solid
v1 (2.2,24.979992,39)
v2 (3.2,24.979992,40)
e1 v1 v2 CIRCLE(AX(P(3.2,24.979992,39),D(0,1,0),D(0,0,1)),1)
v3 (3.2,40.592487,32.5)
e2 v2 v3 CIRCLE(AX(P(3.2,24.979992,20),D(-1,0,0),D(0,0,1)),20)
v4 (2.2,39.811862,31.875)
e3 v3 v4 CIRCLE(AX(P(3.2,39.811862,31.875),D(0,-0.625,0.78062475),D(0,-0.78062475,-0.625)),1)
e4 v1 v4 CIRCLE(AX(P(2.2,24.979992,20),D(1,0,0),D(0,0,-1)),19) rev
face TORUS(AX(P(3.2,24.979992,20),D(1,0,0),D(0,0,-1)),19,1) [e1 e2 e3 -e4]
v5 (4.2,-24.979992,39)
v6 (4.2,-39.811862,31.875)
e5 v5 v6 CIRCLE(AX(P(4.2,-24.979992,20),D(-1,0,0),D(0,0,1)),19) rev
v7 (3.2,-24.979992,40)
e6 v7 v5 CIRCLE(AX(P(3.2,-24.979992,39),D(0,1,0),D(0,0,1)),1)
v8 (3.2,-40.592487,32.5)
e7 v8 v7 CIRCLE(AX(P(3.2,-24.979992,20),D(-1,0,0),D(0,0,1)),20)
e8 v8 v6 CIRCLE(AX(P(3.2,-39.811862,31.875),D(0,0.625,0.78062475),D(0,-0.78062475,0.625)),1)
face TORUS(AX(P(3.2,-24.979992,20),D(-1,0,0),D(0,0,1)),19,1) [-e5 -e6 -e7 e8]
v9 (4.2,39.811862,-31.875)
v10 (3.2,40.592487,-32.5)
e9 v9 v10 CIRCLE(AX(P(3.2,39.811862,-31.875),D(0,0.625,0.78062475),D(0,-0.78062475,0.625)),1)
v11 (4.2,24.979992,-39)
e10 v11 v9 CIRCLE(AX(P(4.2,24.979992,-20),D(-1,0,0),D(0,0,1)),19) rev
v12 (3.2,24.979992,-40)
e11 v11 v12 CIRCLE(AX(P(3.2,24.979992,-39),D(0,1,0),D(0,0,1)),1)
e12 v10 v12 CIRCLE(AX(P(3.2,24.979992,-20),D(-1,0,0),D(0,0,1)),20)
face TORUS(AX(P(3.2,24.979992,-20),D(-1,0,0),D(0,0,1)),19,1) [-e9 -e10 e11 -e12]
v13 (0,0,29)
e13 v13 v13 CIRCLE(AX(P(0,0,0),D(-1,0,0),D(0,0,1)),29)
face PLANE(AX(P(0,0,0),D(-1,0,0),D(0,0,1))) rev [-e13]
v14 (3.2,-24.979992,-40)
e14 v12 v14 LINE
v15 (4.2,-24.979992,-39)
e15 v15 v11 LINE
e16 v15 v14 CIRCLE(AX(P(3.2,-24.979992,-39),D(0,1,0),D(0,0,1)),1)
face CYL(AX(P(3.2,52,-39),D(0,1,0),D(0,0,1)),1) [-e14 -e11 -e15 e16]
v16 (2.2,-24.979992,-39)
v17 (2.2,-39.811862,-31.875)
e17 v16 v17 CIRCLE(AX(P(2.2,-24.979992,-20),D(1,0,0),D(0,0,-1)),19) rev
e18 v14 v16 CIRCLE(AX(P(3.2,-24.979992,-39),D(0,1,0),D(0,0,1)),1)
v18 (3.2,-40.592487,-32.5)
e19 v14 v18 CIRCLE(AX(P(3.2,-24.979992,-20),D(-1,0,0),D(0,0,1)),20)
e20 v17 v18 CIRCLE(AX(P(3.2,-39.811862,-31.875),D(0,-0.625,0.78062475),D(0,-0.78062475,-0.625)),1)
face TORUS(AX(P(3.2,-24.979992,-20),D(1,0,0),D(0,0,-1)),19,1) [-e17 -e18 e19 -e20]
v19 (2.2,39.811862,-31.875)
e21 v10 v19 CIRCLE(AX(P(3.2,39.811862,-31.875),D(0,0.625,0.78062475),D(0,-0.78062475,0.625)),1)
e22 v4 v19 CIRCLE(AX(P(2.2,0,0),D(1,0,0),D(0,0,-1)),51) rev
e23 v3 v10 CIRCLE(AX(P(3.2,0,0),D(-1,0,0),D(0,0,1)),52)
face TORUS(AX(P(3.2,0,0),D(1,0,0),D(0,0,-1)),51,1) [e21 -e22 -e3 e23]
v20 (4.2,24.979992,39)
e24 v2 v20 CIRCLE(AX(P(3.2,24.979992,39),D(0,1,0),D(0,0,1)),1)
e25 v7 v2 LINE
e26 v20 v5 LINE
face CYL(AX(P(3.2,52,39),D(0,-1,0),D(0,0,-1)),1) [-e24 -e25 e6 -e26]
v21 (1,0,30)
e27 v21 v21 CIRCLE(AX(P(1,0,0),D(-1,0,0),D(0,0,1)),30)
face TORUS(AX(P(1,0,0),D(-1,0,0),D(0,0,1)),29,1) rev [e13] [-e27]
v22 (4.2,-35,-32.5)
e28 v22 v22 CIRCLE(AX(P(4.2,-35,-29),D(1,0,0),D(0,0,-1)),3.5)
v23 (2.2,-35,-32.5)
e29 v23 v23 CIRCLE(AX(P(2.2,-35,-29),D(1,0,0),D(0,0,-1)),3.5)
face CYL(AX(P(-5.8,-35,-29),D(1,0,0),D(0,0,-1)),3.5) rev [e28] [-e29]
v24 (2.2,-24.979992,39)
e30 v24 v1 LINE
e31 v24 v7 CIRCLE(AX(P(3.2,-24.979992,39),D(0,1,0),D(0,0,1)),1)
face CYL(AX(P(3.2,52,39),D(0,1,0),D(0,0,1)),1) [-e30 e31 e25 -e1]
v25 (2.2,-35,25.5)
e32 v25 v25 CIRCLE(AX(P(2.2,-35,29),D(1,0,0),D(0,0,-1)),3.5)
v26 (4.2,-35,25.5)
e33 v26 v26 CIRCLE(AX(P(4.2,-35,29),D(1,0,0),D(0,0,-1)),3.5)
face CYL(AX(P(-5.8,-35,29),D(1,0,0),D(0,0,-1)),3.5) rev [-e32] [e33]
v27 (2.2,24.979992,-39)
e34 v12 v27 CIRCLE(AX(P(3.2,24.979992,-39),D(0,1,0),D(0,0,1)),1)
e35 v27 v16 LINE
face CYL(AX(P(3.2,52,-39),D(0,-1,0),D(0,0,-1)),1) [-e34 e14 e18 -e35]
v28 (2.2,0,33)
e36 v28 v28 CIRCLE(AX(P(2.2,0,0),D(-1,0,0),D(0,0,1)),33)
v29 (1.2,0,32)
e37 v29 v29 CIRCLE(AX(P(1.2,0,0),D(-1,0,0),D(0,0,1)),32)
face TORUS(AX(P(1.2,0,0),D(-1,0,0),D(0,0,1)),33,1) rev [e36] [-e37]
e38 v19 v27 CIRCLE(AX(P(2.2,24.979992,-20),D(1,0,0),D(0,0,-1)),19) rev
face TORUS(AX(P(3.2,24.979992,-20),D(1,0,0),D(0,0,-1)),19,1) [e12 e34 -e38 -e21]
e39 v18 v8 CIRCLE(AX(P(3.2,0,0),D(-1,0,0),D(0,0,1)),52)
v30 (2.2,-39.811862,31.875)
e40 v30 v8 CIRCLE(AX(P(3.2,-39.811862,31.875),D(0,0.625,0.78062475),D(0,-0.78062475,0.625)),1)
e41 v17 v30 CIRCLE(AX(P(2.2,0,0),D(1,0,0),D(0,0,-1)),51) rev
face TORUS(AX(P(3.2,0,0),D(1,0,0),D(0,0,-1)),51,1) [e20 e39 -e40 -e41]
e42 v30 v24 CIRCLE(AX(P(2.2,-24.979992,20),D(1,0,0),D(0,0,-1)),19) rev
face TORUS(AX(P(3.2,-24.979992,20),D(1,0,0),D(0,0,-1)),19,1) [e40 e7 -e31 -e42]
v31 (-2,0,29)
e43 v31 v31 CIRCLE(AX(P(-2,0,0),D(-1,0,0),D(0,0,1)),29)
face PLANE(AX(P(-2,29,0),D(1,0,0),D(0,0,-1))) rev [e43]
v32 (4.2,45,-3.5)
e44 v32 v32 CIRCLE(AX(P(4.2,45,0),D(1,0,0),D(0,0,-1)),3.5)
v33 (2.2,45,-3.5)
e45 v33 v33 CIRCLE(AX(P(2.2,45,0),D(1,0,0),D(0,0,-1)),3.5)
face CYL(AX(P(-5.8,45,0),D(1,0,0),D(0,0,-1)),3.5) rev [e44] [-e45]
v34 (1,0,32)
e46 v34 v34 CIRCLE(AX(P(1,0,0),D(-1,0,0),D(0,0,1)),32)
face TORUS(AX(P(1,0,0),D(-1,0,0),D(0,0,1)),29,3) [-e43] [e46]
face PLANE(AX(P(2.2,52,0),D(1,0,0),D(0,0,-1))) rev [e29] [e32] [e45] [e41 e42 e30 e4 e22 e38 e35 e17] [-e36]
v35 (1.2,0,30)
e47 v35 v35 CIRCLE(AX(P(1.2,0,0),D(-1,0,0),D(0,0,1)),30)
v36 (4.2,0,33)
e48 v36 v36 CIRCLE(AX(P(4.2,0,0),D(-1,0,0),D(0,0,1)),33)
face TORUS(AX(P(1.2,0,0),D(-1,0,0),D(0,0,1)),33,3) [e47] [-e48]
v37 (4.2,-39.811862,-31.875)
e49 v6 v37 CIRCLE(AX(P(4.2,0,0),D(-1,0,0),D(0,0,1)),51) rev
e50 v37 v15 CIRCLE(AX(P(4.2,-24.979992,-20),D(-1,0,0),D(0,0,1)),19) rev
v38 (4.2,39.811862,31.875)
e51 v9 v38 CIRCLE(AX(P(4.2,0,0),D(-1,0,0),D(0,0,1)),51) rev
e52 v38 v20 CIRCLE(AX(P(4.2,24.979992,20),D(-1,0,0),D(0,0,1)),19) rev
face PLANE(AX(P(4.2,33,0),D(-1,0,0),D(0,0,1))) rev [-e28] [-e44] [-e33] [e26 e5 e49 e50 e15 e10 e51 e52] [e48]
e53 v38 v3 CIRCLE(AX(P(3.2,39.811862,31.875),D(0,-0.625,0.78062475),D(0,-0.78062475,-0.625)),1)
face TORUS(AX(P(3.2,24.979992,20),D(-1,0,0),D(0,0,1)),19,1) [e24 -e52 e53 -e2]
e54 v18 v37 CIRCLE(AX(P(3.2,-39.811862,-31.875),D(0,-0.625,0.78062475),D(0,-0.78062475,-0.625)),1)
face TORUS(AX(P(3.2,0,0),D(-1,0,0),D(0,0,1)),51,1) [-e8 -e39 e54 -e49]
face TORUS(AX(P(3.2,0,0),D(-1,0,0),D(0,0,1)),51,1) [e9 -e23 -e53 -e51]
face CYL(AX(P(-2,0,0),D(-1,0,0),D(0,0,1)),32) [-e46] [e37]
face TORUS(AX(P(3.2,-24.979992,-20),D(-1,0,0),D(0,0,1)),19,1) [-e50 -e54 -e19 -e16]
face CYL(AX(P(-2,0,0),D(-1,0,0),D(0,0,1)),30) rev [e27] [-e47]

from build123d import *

# Parameters (mm, degrees)
SKETCH2_OUTSIDE_W   = 135.442
SKETCH2_OUTSIDE_H   = 135.442
SKETCH2_OUTSIDE_W_2 = 80
SKETCH2_OUTSIDE_H_2 = 104
CUT_EXTRUDE1_DEPTH  = 74.8
SKETCH3_R           = 3.5
CUT_EXTRUDE2_DEPTH  = 10
FILLET1_R           = 20
FILLET2_R           = 1


with BuildPart() as part:
    # Sketch1 → Revolve1 (revolve)
    with BuildSketch(Plane.XY, mode=Mode.PRIVATE) as revolve1_sk:
        with BuildLine():
            Line((0, 0), (0, 29))
            ThreePointArc((0, 29), (0.292893219, 29.707106781), (1, 30))
            Line((1, 30), (1.2, 30))
            ThreePointArc((1.2, 30), (3.321320344, 30.878679656), (4.2, 33))
            Line((4.2, 33), (4.2, 52))
            Line((4.2, 52), (2.2, 52))
            Line((2.2, 52), (2.2, 33))
            ThreePointArc((2.2, 33), (1.907106781, 32.292893219), (1.2, 32))
            Line((1.2, 32), (1, 32))
            ThreePointArc((1, 32), (-1.121320344, 31.121320344), (-2, 29))
            Line((-2, 29), (-2, 0))
            Line((-2, 0), (0, 0))
        make_face()
    revolve(revolve1_sk.sketch.rotate(Axis((-2, 0, 0), (1, 0, 0)), 90), axis=Axis((-2, 0, 0), (1, 0, 0)))

    # Sketch2 outside → Cut-Extrude1 (cut, through all)
    with BuildSketch(Plane(origin=(4.2, 0, 0), x_dir=(0, 0, -1), z_dir=(1, 0, 0))):
        Rectangle(SKETCH2_OUTSIDE_W, SKETCH2_OUTSIDE_H)
        Rectangle(SKETCH2_OUTSIDE_W_2, SKETCH2_OUTSIDE_H_2, mode=Mode.SUBTRACT)
    extrude(amount=-CUT_EXTRUDE1_DEPTH, mode=Mode.SUBTRACT)

    # Sketch3 → Cut-Extrude2 (cut)
    with BuildSketch(Plane(origin=(4.2, 0, 0), x_dir=(0, 0, -1), z_dir=(1, 0, 0))):
        with Locations((0, 45)):
            Circle(SKETCH3_R)
        with Locations((-29, -35)):
            Circle(SKETCH3_R)
        with Locations((29, -35)):
            Circle(SKETCH3_R)
    extrude(amount=-CUT_EXTRUDE2_DEPTH, mode=Mode.SUBTRACT)

    # Fillet1
    fillet1_edges = [part.edges().sort_by_distance(p)[0] for p in [
        (3.2, 33.226495452, 40),
        (3.2, -33.226495452, 40),
        (3.2, -33.226495452, -40),
        (3.2, 33.226495452, -40),
    ]]
    fillet(fillet1_edges, radius=FILLET1_R)

    # Fillet2
    fillet2_edges = [part.edges().sort_by_distance(p)[0] for p in [
        (2.2, 33.640246031, 38.027756377),
        (2.2, 0, 40),
        (2.2, -33.640246031, 38.027756377),
        (2.2, -52, 0),
        (2.2, -33.640246031, -38.027756377),
        (2.2, 0, -40),
        (2.2, 33.640246031, -38.027756377),
        (4.2, 33.640246031, 38.027756377),
        (4.2, 0, 40),
        (4.2, -33.640246031, 38.027756377),
        (4.2, -52, 0),
        (4.2, -33.640246031, -38.027756377),
        (4.2, 0, -40),
        (4.2, 33.640246031, -38.027756377),
        (2.2, 52, 0),
        (4.2, 52, 0),
    ]]
    fillet(fillet2_edges, radius=FILLET2_R - 0.0001)  # a hair under: the kernel refuses the full size


solid = part.part
